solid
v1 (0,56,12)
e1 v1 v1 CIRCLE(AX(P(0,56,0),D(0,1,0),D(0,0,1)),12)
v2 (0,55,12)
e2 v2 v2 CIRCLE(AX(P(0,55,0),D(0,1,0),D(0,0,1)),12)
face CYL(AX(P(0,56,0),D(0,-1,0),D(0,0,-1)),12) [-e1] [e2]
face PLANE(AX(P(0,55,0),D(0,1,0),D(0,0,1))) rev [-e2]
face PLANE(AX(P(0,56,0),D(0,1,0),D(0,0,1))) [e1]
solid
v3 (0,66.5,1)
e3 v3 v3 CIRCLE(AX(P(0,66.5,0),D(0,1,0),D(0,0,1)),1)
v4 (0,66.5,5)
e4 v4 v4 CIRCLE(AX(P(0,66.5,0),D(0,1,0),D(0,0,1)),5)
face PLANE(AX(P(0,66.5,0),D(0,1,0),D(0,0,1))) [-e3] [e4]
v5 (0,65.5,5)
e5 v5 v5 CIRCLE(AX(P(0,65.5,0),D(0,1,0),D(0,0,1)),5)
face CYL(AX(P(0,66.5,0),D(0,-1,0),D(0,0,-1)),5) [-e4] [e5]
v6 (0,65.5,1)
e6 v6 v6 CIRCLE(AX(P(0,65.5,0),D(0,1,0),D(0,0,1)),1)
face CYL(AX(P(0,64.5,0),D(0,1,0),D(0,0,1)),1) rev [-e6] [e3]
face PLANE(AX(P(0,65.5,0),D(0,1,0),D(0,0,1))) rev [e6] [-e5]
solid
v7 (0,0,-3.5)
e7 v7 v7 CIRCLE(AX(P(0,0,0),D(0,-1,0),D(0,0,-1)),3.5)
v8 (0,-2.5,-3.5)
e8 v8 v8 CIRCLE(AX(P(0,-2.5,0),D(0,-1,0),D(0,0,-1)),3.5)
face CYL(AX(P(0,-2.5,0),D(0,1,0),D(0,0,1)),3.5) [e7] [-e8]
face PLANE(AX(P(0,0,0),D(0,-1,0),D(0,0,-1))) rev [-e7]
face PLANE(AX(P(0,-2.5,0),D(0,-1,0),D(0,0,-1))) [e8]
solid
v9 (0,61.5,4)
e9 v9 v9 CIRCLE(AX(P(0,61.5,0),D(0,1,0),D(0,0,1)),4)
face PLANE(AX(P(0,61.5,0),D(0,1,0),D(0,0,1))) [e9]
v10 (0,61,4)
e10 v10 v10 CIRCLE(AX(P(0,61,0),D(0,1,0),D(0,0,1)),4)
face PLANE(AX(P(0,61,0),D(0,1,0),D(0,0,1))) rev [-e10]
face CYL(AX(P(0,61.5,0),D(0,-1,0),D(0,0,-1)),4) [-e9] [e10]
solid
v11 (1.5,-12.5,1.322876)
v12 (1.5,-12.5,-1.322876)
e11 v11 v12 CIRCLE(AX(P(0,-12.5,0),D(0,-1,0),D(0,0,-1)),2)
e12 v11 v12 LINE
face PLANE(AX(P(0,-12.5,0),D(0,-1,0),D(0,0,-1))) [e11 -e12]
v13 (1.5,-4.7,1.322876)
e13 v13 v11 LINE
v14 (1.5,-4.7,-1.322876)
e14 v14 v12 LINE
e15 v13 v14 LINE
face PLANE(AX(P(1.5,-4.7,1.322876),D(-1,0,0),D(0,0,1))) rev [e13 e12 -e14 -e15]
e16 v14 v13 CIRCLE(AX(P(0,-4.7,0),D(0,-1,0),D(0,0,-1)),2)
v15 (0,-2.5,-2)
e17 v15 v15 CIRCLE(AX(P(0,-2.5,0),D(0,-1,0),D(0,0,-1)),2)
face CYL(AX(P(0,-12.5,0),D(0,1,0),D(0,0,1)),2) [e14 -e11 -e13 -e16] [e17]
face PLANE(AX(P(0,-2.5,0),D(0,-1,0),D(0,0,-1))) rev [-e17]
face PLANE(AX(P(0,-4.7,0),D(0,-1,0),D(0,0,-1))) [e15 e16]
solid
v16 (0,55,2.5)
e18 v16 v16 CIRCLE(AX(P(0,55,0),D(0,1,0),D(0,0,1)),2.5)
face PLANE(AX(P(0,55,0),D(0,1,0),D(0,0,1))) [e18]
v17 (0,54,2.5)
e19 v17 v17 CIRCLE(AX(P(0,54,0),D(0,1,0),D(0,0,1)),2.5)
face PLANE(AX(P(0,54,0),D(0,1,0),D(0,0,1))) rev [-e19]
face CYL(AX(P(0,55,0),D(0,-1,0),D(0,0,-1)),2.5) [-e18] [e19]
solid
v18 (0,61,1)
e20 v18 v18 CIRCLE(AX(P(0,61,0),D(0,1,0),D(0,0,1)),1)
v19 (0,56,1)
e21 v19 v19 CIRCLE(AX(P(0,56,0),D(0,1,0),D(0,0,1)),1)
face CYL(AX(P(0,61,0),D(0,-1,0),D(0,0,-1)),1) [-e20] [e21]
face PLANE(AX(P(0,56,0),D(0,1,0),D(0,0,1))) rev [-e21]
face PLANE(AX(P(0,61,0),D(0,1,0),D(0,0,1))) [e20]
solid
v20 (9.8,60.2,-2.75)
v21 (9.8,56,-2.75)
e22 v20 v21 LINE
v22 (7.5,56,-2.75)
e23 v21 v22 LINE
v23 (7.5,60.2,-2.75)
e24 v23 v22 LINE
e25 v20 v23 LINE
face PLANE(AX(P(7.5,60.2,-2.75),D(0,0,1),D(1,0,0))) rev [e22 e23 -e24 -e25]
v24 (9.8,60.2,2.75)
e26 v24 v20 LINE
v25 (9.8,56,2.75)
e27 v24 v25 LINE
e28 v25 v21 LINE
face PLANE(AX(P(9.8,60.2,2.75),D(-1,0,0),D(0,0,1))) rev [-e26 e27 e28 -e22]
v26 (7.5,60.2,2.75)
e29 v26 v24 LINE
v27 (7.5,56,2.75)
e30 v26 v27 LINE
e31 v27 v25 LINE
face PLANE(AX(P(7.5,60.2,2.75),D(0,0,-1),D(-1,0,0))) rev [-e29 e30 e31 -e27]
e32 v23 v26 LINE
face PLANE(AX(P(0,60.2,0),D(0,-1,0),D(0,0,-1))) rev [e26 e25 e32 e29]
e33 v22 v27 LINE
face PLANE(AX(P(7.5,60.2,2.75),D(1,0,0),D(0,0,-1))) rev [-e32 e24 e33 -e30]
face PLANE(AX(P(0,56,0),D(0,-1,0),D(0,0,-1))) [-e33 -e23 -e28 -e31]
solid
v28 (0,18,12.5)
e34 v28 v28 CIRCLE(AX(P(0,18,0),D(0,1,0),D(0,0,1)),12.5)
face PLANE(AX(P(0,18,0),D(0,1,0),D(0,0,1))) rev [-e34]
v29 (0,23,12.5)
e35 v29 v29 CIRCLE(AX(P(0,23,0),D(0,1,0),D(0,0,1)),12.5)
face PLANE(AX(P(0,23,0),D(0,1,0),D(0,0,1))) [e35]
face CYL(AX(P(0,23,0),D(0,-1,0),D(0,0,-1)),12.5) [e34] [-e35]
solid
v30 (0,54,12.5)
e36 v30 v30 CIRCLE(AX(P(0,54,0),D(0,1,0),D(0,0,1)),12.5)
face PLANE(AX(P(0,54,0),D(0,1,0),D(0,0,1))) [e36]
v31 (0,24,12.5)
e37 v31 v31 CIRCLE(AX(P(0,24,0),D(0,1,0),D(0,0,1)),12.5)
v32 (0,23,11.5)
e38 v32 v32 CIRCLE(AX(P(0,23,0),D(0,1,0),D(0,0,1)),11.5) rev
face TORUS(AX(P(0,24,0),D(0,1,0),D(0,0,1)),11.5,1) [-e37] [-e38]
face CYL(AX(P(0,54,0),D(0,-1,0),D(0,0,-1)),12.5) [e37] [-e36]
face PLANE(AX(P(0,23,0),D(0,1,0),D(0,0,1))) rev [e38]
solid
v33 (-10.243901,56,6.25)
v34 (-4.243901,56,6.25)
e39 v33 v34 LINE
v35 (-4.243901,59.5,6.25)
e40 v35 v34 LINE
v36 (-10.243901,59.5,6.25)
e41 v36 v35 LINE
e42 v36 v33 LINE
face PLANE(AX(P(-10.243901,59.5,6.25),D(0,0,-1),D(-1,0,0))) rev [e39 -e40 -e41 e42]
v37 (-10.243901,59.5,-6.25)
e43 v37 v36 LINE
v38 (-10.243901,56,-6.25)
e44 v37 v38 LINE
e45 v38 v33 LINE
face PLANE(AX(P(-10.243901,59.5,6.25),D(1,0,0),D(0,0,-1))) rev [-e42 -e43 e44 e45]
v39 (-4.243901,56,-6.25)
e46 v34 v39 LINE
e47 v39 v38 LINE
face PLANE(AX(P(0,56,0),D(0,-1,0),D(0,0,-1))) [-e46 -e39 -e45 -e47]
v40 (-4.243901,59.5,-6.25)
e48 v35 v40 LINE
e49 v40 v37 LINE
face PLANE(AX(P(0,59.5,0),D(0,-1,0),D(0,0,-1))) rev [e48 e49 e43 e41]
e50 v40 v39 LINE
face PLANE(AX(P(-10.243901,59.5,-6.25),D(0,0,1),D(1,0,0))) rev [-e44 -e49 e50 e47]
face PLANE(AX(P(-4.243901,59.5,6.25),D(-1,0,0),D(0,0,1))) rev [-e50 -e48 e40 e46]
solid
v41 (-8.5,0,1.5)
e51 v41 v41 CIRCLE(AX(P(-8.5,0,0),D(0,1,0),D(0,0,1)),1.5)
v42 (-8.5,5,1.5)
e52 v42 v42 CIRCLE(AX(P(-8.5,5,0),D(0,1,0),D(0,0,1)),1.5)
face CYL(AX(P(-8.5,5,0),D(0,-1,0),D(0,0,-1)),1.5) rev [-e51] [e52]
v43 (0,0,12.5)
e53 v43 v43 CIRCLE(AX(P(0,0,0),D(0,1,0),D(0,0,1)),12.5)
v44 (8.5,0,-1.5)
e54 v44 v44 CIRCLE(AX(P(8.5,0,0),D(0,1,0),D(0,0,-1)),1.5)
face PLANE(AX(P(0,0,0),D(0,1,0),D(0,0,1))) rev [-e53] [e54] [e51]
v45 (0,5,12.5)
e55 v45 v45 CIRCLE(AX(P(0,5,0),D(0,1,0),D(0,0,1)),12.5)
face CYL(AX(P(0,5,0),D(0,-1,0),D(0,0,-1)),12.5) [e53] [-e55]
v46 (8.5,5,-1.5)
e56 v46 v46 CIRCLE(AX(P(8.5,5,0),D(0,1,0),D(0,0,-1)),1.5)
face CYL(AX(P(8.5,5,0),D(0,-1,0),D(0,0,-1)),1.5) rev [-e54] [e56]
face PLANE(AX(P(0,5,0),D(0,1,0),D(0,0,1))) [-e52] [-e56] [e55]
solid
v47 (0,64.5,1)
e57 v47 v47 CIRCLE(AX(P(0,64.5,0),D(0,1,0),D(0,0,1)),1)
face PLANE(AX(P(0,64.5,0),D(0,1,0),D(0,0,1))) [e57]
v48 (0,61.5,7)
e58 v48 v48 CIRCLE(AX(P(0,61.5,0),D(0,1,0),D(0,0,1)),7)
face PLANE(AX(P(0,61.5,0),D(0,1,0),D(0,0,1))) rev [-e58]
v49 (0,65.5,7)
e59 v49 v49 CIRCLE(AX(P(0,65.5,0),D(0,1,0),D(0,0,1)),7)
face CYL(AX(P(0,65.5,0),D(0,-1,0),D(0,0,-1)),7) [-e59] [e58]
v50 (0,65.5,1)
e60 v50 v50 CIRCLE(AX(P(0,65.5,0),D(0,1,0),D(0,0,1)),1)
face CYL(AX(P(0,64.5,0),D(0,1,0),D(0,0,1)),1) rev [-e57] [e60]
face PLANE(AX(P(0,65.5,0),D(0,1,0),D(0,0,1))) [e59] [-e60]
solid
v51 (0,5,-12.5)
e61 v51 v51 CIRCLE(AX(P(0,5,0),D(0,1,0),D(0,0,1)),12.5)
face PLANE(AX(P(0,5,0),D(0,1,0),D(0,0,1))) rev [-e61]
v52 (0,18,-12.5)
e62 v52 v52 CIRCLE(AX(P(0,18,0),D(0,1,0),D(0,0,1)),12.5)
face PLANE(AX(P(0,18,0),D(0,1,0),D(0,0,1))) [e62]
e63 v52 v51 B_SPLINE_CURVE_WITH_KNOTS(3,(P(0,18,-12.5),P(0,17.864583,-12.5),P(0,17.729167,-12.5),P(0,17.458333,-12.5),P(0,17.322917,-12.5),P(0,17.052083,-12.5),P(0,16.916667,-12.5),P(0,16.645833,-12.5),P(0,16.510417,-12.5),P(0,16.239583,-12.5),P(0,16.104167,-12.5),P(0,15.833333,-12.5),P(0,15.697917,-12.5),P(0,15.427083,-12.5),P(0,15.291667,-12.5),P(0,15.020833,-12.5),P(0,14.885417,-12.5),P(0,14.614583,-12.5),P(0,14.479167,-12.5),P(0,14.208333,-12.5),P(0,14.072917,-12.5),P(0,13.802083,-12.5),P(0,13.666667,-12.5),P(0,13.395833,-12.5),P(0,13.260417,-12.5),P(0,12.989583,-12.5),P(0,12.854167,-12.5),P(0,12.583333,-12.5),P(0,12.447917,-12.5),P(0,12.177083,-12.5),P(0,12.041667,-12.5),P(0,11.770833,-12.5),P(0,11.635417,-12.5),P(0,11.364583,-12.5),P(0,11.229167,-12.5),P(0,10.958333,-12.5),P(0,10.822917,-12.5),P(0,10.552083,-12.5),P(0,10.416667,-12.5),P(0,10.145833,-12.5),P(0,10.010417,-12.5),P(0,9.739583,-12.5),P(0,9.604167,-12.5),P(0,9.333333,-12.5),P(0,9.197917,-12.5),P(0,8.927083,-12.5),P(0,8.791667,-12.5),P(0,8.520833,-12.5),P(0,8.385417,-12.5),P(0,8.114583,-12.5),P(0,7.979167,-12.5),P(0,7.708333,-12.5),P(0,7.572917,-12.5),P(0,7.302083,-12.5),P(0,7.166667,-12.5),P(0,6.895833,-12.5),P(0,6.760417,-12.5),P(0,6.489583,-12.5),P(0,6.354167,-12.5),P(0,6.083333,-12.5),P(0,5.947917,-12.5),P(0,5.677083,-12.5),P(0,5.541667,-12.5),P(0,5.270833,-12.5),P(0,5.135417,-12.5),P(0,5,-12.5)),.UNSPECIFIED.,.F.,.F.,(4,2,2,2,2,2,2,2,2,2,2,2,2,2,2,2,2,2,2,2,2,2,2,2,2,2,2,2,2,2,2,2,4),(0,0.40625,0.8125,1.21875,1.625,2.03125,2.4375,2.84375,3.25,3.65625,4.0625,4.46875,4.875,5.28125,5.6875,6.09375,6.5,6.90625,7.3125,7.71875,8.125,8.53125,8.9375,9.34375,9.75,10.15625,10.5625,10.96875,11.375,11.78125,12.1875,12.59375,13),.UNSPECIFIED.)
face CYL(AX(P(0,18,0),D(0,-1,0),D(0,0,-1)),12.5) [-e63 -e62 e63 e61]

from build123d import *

# Parameters (mm, degrees)
SKETCH1_R            = 12.5
SKETCH1_R_2          = 1.5
BOSS_EXTRUDE1_DEPTH  = 5
SKETCH2_R            = 12.5
BOSS_EXTRUDE2_DEPTH  = 13
SKETCH3_R            = 12.5
BOSS_EXTRUDE3_DEPTH  = 5
SKETCH4_R            = 12.5
BOSS_EXTRUDE4_DEPTH  = 31
FILLET2_R            = 1
SKETCH5_R            = 2.5
BOSS_EXTRUDE5_DEPTH  = 1
SKETCH6_R            = 12
BOSS_EXTRUDE6_DEPTH  = 1
SKETCH7_R            = 1
BOSS_EXTRUDE7_DEPTH  = 5
SKETCH8_R            = 4
BOSS_EXTRUDE8_DEPTH  = 0.5
SKETCH9_R            = 7
BOSS_EXTRUDE9_DEPTH  = 4
SKETCH10_R           = 5
BOSS_EXTRUDE10_DEPTH = 1
SKETCH11_R           = 1
CUT_EXTRUDE1_DEPTH   = 2
SKETCH12_R           = 3.5
BOSS_EXTRUDE11_DEPTH = 2.5
SKETCH13_R           = 2
BOSS_EXTRUDE12_DEPTH = 10
CUT_EXTRUDE2_DEPTH   = 7.8
SKETCH15_W           = 6
SKETCH15_H           = 12.5
BOSS_EXTRUDE13_DEPTH = 3.5
SKETCH16_W           = 2.3
SKETCH16_H           = 5.5
BOSS_EXTRUDE14_DEPTH = 4.2


with BuildPart() as part:
    # Sketch1 → Boss-Extrude1 (new body)
    with BuildSketch(Plane(origin=(0, 0, 0), x_dir=(1, 0, 0), z_dir=(0, 1, 0))):
        with Locations(Location((0, 0, 0), (0, 0, 270))):
            Circle(SKETCH1_R)
        with Locations(Location((-8.5, 0, 0), (0, 0, 270))):
            Circle(SKETCH1_R_2, mode=Mode.SUBTRACT)
        with Locations(Location((8.5, 0, 0), (0, 0, 90))):
            Circle(SKETCH1_R_2, mode=Mode.SUBTRACT)
    extrude(amount=BOSS_EXTRUDE1_DEPTH)


with BuildPart() as body_2:
    # Sketch2 → Boss-Extrude2 (new body)
    with BuildSketch(Plane(origin=(0, 5, 0), x_dir=(1, 0, 0), z_dir=(0, 1, 0))):
        with Locations(Location((0, 0, 0), (0, 0, 90))):
            Circle(SKETCH2_R)
    extrude(amount=BOSS_EXTRUDE2_DEPTH)


with BuildPart() as body_3:
    # Sketch3 → Boss-Extrude3 (new body)
    with BuildSketch(Plane(origin=(0, 18, 0), x_dir=(1, 0, 0), z_dir=(0, 1, 0))):
        with Locations(Location((0, 0, 0), (0, 0, 270))):
            Circle(SKETCH3_R)
    extrude(amount=BOSS_EXTRUDE3_DEPTH)


with BuildPart() as body_4:
    # Sketch4 → Boss-Extrude4 (new body)
    with BuildSketch(Plane(origin=(0, 23, 0), x_dir=(1, 0, 0), z_dir=(0, 1, 0))):
        with Locations(Location((0, 0, 0), (0, 0, 270))):
            Circle(SKETCH4_R)
    extrude(amount=BOSS_EXTRUDE4_DEPTH)

    # Fillet2
    fillet2_edges = [body_4.edges().sort_by_distance(p)[0] for p in [
        (0, 23, -12.5),
    ]]
    fillet(fillet2_edges, radius=FILLET2_R)


with BuildPart() as body_5:
    # Sketch5 → Boss-Extrude5 (new body)
    with BuildSketch(Plane(origin=(0, 54, 0), x_dir=(1, 0, 0), z_dir=(0, 1, 0))):
        with Locations(Location((0, 0, 0), (0, 0, 270))):
            Circle(SKETCH5_R)
    extrude(amount=BOSS_EXTRUDE5_DEPTH)


with BuildPart() as body_6:
    # Sketch6 → Boss-Extrude6 (new body)
    with BuildSketch(Plane(origin=(0, 55, 0), x_dir=(1, 0, 0), z_dir=(0, 1, 0))):
        with Locations(Location((0, 0, 0), (0, 0, 270))):
            Circle(SKETCH6_R)
    extrude(amount=BOSS_EXTRUDE6_DEPTH)


with BuildPart() as body_7:
    # Sketch7 → Boss-Extrude7 (new body)
    with BuildSketch(Plane(origin=(0, 56, 0), x_dir=(1, 0, 0), z_dir=(0, 1, 0))):
        with Locations(Location((0, 0, 0), (0, 0, 270))):
            Circle(SKETCH7_R)
    extrude(amount=BOSS_EXTRUDE7_DEPTH)


with BuildPart() as body_8:
    # Sketch8 → Boss-Extrude8 (new body)
    with BuildSketch(Plane(origin=(0, 61, 0), x_dir=(1, 0, 0), z_dir=(0, 1, 0))):
        with Locations(Location((0, 0, 0), (0, 0, 270))):
            Circle(SKETCH8_R)
    extrude(amount=BOSS_EXTRUDE8_DEPTH)


with BuildPart() as body_9:
    # Sketch9 → Boss-Extrude9 (new body)
    with BuildSketch(Plane(origin=(0, 61.5, 0), x_dir=(1, 0, 0), z_dir=(0, 1, 0))):
        with Locations(Location((0, 0, 0), (0, 0, 270))):
            Circle(SKETCH9_R)
    extrude(amount=BOSS_EXTRUDE9_DEPTH)


with BuildPart() as body_10:
    # Sketch10 → Boss-Extrude10 (new body)
    with BuildSketch(Plane(origin=(0, 65.5, 0), x_dir=(1, 0, 0), z_dir=(0, 1, 0))):
        with Locations(Location((0, 0, 0), (0, 0, 270))):
            Circle(SKETCH10_R)
    extrude(amount=BOSS_EXTRUDE10_DEPTH)


with BuildPart() as cut_extrude1_tool:
    # Sketch11 → Cut-Extrude1 (new body)
    with BuildSketch(Plane(origin=(0, 66.5, 0), x_dir=(1, 0, 0), z_dir=(0, 1, 0))):
        with Locations(Location((0, 0, 0), (0, 0, 270))):
            Circle(SKETCH11_R)
    extrude(amount=-CUT_EXTRUDE1_DEPTH)


with BuildPart() as body_9_1:
    add(body_9.part)

    # Cut-Extrude1: cut by cut_extrude1_tool
    add(cut_extrude1_tool.part, mode=Mode.SUBTRACT)


with BuildPart() as body_10_1:
    add(body_10.part)

    # Cut-Extrude1: cut by cut_extrude1_tool
    add(cut_extrude1_tool.part, mode=Mode.SUBTRACT)


with BuildPart() as body_11:
    # Sketch12 → Boss-Extrude11 (new body)
    with BuildSketch(Plane.XZ):
        with Locations(Location((0, 0, 0), (0, 0, 270))):
            Circle(SKETCH12_R)
    extrude(amount=BOSS_EXTRUDE11_DEPTH)


with BuildPart() as body_12:
    # Sketch13 → Boss-Extrude12 (new body)
    with BuildSketch(Plane.XZ.offset(2.5)):
        with Locations(Location((0, 0, 0), (0, 0, 270))):
            Circle(SKETCH13_R)
    extrude(amount=BOSS_EXTRUDE12_DEPTH)

    # Sketch14 → Cut-Extrude2 (cut)
    with BuildSketch(Plane.XZ.offset(12.5)):
        with BuildLine():
            Line((1.5, 1.322875656), (1.5, -1.322875656))
            ThreePointArc((1.5, -1.322875656), (2, 0), (1.5, 1.322875656))
        make_face()
    extrude(amount=-CUT_EXTRUDE2_DEPTH, mode=Mode.SUBTRACT)


with BuildPart() as body_13:
    # Sketch15 → Boss-Extrude13 (new body)
    with BuildSketch(Plane(origin=(0, 56, 0), x_dir=(1, 0, 0), z_dir=(0, 1, 0))):
        with Locations((-7.243900624, 0)):
            Rectangle(SKETCH15_W, SKETCH15_H)
    extrude(amount=BOSS_EXTRUDE13_DEPTH)


with BuildPart() as body_14:
    # Sketch16 → Boss-Extrude14 (new body)
    with BuildSketch(Plane(origin=(0, 56, 0), x_dir=(1, 0, 0), z_dir=(0, 1, 0))):
        with Locations((8.65, 0)):
            Rectangle(SKETCH16_W, SKETCH16_H)
    extrude(amount=BOSS_EXTRUDE14_DEPTH)


solid = Compound([part.part, body_2.part, body_3.part, body_4.part, body_5.part, body_6.part, body_7.part, body_8.part, body_9_1.part, body_10_1.part, body_11.part, body_12.part, body_13.part, body_14.part])
